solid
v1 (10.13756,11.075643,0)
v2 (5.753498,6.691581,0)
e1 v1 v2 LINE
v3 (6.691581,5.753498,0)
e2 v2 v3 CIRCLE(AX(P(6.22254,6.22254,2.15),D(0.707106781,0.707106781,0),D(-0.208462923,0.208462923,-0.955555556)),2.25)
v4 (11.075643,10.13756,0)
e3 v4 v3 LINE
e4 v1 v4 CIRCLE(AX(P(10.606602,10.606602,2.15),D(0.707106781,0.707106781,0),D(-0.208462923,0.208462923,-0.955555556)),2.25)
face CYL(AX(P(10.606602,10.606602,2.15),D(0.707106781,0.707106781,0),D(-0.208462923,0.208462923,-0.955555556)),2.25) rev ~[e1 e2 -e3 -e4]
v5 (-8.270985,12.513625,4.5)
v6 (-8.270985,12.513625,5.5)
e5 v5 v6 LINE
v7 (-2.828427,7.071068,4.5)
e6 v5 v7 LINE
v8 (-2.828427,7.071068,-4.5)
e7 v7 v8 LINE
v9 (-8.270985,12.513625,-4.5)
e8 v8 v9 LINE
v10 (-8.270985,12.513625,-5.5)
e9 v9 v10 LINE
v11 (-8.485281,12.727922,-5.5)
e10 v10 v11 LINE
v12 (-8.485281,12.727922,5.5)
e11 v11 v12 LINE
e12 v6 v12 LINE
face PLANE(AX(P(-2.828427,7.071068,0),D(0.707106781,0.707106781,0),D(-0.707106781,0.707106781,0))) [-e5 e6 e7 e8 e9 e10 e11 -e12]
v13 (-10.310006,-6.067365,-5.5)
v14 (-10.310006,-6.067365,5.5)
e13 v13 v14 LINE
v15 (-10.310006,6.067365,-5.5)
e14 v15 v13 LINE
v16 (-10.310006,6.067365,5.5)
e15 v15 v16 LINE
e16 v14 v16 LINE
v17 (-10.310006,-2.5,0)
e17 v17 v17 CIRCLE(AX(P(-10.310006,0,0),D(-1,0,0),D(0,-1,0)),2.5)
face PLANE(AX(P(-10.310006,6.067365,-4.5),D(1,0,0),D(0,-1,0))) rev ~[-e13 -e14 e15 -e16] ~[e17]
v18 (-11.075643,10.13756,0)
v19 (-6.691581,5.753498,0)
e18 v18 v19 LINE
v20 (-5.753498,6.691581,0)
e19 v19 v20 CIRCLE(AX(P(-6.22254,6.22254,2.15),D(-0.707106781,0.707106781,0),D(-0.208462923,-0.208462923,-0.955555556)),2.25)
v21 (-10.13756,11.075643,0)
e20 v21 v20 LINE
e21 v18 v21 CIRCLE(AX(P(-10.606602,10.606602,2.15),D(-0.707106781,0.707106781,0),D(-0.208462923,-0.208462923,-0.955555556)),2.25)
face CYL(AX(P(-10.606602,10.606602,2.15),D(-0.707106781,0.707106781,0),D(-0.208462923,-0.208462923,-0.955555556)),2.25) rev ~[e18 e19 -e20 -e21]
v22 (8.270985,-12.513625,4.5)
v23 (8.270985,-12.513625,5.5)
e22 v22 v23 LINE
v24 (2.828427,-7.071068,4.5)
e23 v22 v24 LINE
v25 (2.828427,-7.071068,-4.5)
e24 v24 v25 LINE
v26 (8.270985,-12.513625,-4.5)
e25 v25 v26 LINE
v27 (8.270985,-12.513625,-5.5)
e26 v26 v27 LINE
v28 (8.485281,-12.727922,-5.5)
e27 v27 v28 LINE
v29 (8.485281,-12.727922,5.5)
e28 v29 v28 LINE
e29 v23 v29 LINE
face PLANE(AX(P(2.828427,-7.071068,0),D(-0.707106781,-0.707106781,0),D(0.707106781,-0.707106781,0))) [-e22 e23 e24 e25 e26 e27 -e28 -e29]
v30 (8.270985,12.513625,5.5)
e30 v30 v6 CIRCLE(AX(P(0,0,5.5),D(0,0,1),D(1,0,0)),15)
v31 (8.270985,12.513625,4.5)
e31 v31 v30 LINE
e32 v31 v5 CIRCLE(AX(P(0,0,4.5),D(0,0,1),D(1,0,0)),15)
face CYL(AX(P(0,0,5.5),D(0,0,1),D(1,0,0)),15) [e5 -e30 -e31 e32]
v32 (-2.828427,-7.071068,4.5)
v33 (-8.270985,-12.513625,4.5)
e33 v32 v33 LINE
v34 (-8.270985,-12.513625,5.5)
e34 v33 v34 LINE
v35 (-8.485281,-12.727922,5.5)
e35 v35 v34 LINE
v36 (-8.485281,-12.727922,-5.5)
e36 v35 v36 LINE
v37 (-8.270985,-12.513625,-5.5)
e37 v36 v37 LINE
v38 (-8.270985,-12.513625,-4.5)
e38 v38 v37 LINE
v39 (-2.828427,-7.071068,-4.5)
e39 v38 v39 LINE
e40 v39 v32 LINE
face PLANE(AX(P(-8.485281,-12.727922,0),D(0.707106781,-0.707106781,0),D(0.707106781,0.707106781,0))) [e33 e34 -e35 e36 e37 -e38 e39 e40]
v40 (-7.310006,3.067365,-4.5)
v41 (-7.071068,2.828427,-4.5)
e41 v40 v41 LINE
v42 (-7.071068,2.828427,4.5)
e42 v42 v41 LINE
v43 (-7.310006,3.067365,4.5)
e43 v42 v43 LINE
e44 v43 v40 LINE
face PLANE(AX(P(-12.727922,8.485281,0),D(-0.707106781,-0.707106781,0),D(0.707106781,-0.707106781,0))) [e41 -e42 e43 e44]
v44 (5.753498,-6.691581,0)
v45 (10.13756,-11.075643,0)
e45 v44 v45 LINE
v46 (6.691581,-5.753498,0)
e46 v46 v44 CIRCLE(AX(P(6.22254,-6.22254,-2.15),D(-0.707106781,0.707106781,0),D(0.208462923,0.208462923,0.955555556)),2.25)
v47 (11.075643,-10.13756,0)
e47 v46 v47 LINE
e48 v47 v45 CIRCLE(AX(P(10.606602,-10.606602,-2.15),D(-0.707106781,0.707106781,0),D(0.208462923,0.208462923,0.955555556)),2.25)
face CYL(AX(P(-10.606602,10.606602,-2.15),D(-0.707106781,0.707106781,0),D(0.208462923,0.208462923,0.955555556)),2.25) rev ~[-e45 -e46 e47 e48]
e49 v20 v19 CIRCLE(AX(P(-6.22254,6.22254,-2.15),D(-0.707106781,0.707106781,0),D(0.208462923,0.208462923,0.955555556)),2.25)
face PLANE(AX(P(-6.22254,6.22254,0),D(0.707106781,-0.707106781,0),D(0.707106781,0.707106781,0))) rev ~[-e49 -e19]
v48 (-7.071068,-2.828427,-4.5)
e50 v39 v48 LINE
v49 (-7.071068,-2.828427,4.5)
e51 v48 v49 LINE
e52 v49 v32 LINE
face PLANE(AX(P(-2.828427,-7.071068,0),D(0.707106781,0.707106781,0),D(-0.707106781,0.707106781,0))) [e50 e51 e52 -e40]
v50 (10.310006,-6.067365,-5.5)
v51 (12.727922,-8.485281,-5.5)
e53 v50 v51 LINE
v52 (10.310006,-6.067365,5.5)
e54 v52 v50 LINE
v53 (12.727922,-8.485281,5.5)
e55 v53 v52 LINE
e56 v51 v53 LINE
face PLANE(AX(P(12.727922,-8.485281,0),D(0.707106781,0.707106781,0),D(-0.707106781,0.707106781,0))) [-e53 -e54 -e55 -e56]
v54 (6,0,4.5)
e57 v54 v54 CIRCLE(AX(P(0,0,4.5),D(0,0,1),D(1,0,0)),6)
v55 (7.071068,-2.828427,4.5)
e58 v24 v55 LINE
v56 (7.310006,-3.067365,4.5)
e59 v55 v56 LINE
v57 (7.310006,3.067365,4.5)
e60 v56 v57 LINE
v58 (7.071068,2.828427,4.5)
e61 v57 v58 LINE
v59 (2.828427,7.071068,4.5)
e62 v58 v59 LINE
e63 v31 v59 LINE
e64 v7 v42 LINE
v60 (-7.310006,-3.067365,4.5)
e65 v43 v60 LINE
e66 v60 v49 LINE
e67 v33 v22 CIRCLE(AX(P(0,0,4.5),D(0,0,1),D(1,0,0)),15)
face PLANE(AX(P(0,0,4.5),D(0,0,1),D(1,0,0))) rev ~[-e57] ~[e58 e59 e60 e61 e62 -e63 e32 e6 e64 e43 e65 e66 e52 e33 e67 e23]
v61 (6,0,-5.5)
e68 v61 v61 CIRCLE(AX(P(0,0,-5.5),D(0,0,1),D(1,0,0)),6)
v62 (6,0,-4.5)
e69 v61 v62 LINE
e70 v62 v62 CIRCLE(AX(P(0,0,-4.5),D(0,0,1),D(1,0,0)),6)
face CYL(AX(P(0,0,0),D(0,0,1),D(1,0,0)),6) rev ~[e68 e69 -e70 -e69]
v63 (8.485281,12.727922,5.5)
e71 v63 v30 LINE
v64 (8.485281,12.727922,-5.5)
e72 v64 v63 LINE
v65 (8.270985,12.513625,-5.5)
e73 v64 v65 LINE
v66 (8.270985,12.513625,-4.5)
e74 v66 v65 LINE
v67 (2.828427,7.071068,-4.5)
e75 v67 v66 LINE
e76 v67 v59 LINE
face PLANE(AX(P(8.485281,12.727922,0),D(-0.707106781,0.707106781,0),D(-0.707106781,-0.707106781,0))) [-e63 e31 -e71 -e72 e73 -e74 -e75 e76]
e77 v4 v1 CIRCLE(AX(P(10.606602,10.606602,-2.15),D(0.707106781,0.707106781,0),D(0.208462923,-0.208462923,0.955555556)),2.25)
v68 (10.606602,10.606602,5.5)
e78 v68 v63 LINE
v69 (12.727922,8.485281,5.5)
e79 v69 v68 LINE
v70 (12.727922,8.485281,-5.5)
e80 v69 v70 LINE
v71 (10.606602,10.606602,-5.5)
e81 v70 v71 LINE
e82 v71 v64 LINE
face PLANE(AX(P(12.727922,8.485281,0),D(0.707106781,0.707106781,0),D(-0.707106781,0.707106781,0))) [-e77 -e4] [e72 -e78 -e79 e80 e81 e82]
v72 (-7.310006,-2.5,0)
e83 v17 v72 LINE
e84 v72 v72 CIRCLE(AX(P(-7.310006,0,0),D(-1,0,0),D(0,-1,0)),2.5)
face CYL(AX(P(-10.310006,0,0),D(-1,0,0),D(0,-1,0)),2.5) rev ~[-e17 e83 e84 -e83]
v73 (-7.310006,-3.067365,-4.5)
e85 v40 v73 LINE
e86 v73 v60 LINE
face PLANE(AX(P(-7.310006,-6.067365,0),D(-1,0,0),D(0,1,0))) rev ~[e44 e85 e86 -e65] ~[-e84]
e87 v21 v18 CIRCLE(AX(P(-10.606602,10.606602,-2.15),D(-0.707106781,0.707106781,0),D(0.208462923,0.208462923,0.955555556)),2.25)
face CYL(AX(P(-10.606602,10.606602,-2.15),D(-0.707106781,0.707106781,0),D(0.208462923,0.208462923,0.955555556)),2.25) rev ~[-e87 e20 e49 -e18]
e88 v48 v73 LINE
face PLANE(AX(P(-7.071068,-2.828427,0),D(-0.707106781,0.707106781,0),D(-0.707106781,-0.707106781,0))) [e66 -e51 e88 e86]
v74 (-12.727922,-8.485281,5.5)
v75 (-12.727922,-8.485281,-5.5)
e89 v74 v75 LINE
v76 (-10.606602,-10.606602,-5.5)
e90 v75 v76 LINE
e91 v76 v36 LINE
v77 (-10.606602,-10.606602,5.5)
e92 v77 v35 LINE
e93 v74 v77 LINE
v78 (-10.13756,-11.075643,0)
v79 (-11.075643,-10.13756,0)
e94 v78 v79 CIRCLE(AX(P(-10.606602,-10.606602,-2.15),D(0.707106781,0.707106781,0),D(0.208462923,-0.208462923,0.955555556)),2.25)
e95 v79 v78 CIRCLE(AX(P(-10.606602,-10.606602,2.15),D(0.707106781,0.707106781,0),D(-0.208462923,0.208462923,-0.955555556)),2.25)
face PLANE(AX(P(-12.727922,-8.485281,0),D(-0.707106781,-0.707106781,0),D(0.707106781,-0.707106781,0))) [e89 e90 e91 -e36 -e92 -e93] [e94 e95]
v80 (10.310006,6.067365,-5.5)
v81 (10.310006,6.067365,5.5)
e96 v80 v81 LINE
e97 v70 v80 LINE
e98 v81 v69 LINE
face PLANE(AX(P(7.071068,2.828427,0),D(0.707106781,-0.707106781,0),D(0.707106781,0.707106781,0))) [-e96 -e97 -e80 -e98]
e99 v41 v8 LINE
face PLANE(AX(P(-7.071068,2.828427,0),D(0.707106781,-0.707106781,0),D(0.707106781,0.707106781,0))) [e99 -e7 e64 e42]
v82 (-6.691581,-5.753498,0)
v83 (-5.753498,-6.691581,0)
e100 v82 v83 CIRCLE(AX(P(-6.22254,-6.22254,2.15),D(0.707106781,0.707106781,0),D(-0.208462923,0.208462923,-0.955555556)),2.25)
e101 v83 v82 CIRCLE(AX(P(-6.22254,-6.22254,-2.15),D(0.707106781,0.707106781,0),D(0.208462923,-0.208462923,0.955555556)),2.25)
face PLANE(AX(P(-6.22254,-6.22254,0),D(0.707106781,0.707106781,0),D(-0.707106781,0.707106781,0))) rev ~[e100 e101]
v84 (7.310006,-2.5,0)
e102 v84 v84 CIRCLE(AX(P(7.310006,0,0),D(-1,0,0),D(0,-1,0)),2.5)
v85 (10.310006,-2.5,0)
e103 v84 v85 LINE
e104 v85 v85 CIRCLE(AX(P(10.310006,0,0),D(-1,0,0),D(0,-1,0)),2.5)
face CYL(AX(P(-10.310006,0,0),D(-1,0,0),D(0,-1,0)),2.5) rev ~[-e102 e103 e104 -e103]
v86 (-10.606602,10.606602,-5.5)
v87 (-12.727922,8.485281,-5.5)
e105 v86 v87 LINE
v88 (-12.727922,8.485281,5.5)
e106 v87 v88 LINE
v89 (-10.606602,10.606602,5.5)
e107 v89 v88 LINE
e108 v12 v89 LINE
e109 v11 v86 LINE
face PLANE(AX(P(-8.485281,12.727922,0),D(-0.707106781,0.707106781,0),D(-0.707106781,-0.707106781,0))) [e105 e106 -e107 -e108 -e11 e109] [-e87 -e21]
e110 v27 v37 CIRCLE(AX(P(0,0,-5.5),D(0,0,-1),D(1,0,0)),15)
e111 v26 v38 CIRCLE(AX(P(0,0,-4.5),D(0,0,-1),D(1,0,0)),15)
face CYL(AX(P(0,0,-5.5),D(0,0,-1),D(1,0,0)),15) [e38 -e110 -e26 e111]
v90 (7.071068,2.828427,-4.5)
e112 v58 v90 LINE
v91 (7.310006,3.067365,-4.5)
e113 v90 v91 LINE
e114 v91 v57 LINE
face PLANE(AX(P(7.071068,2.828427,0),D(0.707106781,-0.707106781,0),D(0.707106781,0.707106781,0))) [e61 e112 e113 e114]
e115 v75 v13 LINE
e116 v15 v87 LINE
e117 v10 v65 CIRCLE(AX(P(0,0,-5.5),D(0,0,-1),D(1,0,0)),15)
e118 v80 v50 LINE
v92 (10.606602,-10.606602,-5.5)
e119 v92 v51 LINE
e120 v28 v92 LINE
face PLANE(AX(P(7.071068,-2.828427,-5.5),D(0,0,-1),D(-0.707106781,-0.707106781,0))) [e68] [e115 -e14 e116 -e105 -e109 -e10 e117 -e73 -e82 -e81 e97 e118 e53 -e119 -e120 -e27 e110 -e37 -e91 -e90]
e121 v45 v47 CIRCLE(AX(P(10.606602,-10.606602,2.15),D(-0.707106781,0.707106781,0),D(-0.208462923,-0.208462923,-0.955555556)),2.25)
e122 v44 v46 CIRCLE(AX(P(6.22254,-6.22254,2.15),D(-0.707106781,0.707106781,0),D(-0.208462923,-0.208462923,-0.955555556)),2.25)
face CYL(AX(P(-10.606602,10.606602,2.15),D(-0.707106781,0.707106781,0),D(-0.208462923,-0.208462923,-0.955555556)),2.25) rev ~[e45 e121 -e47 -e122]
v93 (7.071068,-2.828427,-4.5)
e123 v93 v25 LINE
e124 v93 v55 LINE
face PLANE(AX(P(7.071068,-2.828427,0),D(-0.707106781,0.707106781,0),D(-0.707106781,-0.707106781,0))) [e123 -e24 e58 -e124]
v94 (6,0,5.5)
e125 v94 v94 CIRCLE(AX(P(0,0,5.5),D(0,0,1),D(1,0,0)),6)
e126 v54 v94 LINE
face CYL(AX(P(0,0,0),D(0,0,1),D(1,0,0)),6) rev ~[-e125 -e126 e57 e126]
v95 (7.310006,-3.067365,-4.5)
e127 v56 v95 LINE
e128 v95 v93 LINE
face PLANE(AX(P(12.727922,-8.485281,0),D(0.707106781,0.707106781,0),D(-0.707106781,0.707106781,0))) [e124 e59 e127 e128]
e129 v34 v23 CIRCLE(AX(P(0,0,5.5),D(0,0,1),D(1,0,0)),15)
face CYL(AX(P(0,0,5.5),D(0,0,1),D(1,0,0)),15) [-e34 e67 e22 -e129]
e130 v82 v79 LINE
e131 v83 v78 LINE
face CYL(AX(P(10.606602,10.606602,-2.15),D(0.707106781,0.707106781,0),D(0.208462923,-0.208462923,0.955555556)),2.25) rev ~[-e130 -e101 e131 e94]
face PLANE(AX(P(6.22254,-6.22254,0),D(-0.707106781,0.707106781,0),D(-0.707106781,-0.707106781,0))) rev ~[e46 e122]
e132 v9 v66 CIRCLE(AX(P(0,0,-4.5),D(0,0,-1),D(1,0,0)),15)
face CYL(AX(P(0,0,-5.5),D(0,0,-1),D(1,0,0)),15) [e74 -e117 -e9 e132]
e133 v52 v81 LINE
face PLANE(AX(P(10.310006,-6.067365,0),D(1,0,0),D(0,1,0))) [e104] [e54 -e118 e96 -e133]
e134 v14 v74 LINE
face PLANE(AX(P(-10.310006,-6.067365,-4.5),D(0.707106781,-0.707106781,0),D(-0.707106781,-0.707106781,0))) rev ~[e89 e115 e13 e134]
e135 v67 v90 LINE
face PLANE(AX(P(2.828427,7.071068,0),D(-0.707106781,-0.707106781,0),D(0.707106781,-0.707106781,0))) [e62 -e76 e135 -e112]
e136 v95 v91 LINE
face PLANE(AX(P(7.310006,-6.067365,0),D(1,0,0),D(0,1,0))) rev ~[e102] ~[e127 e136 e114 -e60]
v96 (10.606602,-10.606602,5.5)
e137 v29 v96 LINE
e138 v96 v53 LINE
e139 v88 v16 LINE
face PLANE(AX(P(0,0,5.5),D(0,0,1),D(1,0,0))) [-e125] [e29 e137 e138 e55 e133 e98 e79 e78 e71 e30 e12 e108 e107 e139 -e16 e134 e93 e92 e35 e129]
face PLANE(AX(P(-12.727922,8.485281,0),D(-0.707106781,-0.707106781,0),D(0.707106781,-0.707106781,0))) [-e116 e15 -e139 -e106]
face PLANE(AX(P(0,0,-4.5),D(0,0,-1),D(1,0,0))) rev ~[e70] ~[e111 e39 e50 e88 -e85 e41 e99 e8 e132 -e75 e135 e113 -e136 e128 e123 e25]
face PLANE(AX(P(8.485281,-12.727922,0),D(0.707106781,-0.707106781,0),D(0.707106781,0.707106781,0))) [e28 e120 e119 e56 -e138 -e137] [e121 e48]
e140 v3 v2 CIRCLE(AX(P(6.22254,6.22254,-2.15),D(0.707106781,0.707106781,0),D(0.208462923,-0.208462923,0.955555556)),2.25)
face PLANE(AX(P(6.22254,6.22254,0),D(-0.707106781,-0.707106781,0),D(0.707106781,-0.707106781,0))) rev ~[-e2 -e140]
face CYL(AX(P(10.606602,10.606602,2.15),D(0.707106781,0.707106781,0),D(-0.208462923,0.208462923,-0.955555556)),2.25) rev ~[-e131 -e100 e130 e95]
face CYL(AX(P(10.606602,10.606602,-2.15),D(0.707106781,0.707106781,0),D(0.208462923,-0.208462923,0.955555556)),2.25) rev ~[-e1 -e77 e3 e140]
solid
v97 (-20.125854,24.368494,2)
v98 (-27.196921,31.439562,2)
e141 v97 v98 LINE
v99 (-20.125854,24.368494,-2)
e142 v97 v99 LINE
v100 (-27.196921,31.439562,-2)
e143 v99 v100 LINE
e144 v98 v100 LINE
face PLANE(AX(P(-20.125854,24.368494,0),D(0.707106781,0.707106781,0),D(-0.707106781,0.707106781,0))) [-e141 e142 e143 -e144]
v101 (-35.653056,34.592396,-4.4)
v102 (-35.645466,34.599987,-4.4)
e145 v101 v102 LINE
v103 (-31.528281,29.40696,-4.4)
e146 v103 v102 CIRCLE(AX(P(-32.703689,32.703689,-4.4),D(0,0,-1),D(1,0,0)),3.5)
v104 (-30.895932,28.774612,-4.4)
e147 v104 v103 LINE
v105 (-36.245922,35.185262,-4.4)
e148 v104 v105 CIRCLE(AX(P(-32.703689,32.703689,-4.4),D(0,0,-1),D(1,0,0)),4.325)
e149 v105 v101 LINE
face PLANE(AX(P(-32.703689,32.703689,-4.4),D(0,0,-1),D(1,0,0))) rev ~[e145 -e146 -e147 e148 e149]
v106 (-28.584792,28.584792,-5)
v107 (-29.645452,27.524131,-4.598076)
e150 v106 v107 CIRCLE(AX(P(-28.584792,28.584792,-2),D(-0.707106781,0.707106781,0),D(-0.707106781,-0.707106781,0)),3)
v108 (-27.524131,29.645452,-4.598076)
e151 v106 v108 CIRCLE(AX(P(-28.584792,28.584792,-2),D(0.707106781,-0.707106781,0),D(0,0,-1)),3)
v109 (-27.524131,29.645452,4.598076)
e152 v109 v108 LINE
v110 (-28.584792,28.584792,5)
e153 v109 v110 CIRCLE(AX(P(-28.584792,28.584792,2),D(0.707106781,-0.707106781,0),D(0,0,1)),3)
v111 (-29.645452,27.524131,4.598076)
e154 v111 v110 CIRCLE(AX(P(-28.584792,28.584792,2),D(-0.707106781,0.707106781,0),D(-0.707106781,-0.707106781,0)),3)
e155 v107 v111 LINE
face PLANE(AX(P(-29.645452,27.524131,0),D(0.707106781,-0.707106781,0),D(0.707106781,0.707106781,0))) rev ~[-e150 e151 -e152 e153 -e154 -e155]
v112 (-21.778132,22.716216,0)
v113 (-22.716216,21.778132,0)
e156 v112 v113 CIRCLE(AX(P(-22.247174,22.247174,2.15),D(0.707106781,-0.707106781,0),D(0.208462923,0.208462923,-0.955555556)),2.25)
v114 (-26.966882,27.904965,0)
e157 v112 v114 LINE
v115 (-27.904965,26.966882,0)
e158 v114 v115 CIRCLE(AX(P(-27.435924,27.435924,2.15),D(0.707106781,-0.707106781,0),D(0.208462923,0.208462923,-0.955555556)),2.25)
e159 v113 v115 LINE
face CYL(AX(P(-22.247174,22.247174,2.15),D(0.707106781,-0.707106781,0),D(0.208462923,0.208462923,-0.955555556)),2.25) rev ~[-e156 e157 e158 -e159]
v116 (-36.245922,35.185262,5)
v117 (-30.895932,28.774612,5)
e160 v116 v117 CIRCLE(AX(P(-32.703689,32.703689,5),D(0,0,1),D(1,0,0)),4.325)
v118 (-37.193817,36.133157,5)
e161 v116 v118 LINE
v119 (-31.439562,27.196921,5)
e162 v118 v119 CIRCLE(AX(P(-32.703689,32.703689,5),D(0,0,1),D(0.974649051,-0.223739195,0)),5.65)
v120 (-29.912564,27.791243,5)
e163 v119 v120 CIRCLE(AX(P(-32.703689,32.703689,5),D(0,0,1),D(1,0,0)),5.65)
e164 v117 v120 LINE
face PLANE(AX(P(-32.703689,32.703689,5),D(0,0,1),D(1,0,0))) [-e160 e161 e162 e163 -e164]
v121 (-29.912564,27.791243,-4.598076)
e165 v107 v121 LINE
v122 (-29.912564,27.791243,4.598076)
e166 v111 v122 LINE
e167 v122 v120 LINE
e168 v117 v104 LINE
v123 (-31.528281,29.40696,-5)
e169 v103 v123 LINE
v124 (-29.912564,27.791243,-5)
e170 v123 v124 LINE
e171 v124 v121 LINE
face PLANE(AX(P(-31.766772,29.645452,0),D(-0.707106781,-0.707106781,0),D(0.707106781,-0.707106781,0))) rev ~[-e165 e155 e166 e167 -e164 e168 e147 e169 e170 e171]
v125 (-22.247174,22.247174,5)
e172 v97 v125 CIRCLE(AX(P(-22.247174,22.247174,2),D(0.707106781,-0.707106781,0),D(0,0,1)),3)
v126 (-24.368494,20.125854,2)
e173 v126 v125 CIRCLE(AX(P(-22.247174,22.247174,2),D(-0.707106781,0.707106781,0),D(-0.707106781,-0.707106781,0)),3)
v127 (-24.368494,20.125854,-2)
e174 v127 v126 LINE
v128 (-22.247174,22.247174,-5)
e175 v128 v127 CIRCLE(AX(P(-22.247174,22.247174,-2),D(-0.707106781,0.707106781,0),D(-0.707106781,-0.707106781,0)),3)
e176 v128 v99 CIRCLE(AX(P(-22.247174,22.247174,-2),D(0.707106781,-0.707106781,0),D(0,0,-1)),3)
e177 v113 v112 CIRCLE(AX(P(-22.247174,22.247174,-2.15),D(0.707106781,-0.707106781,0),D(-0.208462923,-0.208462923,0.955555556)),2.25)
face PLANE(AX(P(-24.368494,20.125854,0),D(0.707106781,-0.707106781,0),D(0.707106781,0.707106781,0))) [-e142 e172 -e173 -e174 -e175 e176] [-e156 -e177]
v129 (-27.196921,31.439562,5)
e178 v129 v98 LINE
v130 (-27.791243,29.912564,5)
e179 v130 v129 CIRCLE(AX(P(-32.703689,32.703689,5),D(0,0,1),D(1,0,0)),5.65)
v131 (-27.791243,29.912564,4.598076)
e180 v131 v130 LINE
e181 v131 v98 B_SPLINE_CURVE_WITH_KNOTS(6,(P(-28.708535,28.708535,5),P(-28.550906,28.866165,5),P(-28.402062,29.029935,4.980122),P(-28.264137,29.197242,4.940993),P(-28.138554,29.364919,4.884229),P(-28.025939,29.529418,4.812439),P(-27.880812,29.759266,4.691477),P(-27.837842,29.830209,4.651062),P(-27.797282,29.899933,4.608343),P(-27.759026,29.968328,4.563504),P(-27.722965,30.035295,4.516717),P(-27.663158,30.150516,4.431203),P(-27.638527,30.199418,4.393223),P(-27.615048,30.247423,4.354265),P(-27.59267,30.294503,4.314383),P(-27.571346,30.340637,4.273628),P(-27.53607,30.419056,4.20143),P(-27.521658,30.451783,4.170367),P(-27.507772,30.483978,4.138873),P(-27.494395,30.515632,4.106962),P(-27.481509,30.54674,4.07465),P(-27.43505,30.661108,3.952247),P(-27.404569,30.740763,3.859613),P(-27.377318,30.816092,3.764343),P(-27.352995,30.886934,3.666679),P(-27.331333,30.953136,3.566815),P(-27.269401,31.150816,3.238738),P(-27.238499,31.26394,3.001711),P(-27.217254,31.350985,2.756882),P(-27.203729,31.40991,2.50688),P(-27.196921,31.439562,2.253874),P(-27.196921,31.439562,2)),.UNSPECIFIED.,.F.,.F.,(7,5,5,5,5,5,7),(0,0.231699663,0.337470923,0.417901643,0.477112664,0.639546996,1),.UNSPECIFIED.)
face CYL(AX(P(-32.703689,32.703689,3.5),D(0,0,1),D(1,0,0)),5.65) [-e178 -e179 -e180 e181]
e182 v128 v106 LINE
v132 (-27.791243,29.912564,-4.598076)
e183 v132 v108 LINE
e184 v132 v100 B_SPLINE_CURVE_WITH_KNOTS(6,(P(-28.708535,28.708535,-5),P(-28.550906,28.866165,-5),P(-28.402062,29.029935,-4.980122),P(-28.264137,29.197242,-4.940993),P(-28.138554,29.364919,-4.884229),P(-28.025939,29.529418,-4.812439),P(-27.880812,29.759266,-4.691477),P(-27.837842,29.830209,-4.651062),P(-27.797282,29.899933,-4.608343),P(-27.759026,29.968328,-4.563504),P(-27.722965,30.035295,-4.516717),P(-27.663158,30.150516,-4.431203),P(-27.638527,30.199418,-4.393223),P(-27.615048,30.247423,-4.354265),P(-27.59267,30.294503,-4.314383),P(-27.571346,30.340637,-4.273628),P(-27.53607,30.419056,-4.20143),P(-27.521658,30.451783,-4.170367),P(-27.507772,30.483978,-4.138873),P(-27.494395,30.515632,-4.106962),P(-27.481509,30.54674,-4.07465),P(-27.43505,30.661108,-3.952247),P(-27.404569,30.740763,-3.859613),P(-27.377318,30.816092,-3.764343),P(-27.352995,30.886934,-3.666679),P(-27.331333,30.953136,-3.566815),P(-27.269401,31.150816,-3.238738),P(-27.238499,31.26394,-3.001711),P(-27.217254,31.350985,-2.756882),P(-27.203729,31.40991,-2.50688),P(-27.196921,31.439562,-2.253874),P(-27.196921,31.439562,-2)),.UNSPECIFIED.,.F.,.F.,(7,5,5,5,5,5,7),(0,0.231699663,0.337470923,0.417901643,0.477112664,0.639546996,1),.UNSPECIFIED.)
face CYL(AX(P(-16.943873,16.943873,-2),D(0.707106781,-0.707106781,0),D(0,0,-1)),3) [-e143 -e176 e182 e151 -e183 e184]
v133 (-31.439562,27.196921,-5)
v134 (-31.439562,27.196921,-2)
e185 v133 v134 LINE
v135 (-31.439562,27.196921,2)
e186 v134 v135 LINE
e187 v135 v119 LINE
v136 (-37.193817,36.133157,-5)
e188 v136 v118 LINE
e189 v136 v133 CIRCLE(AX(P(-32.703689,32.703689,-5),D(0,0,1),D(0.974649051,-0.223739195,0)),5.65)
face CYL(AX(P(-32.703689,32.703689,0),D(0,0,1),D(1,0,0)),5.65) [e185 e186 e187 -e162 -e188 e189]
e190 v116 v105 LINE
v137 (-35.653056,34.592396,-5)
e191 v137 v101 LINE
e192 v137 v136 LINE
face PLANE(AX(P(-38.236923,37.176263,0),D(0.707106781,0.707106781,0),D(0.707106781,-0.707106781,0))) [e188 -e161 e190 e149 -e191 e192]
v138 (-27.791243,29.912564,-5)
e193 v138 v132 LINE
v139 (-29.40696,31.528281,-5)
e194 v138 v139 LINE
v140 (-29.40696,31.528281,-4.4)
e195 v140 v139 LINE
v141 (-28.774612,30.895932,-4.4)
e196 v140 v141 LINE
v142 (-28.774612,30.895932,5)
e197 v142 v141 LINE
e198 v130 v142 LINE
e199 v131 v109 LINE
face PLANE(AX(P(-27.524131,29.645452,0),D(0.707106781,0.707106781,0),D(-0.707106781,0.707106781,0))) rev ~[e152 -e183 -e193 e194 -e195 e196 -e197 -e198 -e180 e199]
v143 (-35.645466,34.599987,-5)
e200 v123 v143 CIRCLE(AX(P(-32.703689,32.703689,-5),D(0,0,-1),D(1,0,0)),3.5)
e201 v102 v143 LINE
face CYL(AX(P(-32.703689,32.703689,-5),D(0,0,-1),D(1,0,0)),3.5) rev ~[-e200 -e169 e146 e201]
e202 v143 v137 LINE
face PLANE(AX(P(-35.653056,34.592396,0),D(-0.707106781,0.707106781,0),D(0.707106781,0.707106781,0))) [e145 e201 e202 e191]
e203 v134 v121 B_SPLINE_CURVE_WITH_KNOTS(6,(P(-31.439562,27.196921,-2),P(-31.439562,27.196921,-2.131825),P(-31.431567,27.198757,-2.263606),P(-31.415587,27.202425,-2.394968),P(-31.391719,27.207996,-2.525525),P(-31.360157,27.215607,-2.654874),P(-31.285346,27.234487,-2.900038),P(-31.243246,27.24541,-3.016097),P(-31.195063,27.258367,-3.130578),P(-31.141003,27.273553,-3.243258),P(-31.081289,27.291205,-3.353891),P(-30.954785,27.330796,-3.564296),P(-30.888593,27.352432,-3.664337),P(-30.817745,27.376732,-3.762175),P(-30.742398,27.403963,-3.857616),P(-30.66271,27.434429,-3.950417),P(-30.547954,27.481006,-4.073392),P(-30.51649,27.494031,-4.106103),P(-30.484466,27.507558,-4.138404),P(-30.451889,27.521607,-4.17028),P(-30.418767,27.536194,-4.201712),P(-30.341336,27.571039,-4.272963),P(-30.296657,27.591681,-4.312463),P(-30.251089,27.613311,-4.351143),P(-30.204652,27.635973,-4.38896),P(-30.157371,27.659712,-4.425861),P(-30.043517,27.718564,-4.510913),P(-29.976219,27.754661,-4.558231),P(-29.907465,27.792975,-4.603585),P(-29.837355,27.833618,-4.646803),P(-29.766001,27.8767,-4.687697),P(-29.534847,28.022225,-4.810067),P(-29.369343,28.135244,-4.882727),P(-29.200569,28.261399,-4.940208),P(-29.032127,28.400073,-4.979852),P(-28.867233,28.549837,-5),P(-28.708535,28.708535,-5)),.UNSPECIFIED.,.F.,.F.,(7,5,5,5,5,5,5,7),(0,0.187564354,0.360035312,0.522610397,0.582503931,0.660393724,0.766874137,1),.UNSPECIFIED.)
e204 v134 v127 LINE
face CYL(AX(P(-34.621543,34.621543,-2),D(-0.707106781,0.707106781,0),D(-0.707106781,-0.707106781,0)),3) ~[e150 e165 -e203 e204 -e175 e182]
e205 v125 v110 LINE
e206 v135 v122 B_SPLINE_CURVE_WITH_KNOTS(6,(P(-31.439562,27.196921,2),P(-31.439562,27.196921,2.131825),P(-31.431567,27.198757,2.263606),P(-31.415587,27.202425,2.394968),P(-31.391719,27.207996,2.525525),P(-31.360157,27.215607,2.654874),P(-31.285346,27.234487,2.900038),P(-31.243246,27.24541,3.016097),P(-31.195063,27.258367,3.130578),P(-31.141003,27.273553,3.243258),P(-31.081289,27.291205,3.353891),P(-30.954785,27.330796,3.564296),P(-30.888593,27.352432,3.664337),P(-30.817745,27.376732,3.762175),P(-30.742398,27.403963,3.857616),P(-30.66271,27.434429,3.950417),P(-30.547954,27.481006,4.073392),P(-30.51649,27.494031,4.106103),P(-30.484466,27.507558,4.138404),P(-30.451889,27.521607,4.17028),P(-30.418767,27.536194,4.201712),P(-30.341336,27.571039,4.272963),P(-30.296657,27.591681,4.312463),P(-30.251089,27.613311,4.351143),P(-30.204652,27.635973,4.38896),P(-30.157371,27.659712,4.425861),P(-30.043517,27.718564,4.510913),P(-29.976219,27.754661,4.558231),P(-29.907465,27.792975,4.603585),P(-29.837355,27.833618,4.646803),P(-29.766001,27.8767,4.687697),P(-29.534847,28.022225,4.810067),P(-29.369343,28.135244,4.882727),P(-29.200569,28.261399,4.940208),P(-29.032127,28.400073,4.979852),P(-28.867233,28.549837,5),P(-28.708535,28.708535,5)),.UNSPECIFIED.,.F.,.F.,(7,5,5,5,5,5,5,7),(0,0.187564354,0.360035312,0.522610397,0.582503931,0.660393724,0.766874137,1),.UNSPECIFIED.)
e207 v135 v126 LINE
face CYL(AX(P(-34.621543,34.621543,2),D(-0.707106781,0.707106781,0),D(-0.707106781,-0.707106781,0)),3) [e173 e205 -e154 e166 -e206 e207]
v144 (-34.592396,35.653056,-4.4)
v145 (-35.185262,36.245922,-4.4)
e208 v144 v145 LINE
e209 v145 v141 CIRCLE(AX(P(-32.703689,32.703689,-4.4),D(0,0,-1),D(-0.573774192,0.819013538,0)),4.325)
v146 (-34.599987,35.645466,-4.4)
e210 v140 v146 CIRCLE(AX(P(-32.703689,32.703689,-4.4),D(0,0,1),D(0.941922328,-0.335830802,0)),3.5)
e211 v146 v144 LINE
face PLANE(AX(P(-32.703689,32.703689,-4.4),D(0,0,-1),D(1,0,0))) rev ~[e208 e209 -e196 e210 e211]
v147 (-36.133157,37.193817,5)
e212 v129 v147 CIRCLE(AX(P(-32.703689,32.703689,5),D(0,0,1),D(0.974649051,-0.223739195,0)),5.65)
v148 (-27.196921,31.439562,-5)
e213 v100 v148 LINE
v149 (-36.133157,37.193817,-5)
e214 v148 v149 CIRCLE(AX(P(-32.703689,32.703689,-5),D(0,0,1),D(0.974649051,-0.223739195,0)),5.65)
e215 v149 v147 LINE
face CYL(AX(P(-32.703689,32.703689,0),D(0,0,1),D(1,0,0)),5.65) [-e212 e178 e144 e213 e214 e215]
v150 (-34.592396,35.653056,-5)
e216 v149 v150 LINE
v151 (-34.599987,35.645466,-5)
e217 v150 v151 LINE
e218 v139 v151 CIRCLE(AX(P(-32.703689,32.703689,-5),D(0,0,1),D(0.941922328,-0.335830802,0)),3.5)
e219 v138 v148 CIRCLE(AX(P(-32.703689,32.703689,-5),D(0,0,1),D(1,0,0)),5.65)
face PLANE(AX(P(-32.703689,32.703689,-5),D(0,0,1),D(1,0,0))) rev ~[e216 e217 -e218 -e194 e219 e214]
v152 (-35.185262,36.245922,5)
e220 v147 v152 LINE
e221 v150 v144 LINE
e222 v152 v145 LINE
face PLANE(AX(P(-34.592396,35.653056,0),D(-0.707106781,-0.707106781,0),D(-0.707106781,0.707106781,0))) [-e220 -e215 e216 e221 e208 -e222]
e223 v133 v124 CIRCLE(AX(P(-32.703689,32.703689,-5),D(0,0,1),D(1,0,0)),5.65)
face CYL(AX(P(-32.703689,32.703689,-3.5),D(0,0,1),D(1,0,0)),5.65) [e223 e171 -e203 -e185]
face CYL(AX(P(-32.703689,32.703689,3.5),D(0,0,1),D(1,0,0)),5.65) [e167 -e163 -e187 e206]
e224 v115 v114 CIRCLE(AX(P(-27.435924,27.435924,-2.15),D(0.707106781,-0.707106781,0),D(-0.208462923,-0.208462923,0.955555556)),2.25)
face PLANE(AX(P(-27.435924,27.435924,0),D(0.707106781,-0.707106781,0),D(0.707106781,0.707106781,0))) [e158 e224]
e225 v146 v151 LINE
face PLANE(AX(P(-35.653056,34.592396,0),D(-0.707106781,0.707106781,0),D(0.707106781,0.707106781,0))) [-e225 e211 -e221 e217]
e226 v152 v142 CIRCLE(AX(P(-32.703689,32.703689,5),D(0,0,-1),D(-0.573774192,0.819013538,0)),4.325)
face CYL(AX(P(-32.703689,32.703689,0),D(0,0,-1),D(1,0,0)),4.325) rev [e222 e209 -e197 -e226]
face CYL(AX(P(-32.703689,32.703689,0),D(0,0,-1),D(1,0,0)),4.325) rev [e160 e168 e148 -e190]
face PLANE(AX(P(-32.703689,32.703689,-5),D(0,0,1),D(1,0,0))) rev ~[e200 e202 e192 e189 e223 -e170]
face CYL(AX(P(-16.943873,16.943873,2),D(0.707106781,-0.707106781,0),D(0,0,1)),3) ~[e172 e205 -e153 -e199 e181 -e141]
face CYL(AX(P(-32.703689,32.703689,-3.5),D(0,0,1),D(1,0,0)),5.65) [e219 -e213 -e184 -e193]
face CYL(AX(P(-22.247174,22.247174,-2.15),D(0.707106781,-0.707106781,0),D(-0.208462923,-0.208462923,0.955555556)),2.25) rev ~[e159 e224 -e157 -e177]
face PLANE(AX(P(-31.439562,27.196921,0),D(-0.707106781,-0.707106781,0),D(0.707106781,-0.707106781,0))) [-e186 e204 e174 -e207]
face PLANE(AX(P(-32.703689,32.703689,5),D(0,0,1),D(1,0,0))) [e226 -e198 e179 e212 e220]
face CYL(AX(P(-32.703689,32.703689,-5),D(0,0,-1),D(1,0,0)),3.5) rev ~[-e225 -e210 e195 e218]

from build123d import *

# Parameters (mm, degrees)
F2_DEPTH      = 5.5
F3_R          = 15
F4_DEPTH      = 1
F5_W          = 3
F5_H          = 12.1347305831
F6_DEPTH      = 5
F7_R          = 15
F8_DEPTH      = 1
F9_R          = 6
F10_DEPTH     = 12.5
F12_DEPTH     = 100
F14_DEPTH     = 100
F15_R         = 2.5
F16_DEPTH     = 100
F17_W         = 6
F17_H         = 11
F18_DEPTH     = 1.8
F19_W         = 6
F19_H         = 9
F20_DEPTH     = 1.8
F21_W         = 6
F21_H         = 9
F22_DEPTH     = 1.8
F23_W         = 6
F23_H         = 9
F24_DEPTH     = 1.8
F25_R         = 5.65
F25_R_2       = 4.325
F26_DEPTH     = 5
F28_DEPTH     = 5
F31_R         = 5.65
F31_R_2       = 3.5
F32_DEPTH     = 0.6
F33_DEPTH     = 12.5
F35_DEPTH     = 7.338
F36_T4_DEPTH  = 25
F36_S5_R      = 5.65
F36_T6_DEPTH  = 16
F36_T10_DEPTH = 25
F36_S11_R     = 5.65
F36_T12_DEPTH = 16
F36_T16_DEPTH = 25
F36_S17_R     = 5.65
F36_T18_DEPTH = 16
F36_T22_DEPTH = 25
F36_S23_R     = 5.65
F36_T24_DEPTH = 16
F37_DEPTH     = 12.5


# Not quite as in the source:
# - a fillet or chamfer that OpenCascade refuses, or shapes differently, is made with other operations: its cross-section is extruded or revolved along the edge and cut away or added


with BuildPart() as f2:
    # F1 (on Top) → F2 (new body, symmetric)
    with BuildSketch(Plane.XY):
        Polygon((12.7279220614, 8.4852813742), (8.4852813742, 12.7279220614), (2.8284271247, 7.0710678119), (7.0710678119, 2.8284271247), align=None)
    extrude(amount=F2_DEPTH, both=True)



with BuildPart() as f2b:
    # F1 (on Top) → F2, piece 2 (new body, symmetric)
    with BuildSketch(Plane.XY):
        Polygon((8.4852813742, -12.7279220614), (12.7279220614, -8.4852813742), (7.0710678119, -2.8284271247), (2.8284271247, -7.0710678119), align=None)
    extrude(amount=F2_DEPTH, both=True)


with BuildPart() as f2c:
    # F1 (on Top) → F2, piece 3 (new body, symmetric)
    with BuildSketch(Plane.XY):
        Polygon((-8.4852813742, -12.7279220614), (-2.8284271247, -7.0710678119), (-7.0710678119, -2.8284271247), (-12.7279220614, -8.4852813742), align=None)
    extrude(amount=F2_DEPTH, both=True)


with BuildPart() as f2d:
    # F1 (on Top) → F2, piece 4 (new body, symmetric)
    with BuildSketch(Plane.XY):
        Polygon((-2.8284271247, 7.0710678119), (-8.4852813742, 12.7279220614), (-12.7279220614, 8.4852813742), (-7.0710678119, 2.8284271247), align=None)
    extrude(amount=F2_DEPTH, both=True)


with BuildPart() as f2_1:
    add(f2.part)

    add(f2b.part)  # F4 merges F2b

    add(f2c.part)  # F4 merges F2c

    add(f2d.part)  # F4 merges F2d
    # F3 (on face) → F4 (join)
    with BuildSketch(Plane.XY.offset(5.5)):
        Circle(F3_R)
    extrude(amount=-F4_DEPTH)

    # F5 (on Top) → F6 (join, symmetric)
    with BuildSketch(Plane.XY):
        with Locations((-8.8100059787, 0)):
            Rectangle(F5_W, F5_H)
        with Locations((8.8100059787, 0)):
            Rectangle(F5_W, F5_H)
    extrude(amount=F6_DEPTH, both=True)

    # F7 (on face) → F8 (join)
    with BuildSketch(Plane(origin=(0, 0, -5.5), x_dir=(1, 0, 0), z_dir=(0, 0, -1))):
        Circle(F7_R)
    extrude(amount=-F8_DEPTH)

    # F9 (on Top) → F10 (cut, symmetric)
    with BuildSketch(Plane.XY):
        Circle(F9_R)
    extrude(amount=F10_DEPTH, both=True, mode=Mode.SUBTRACT)

    # F11 (on face) → F12 (cut)
    with BuildSketch(Plane(origin=(10.6066017178, 10.6066017178, 0), x_dir=(-0.7071067812, 0.7071067812, 0), z_dir=(0.7071067812, 0.7071067812, 0))):
        with BuildLine():
            ThreePointArc((-0.6633249581, 0), (0, -4.4), (0.6633249581, 0))
            ThreePointArc((0.6633249581, 0), (0, 4.4), (-0.6633249581, 0))
        make_face()
    extrude(amount=-F12_DEPTH, mode=Mode.SUBTRACT)

    # F13 (on face) → F14 (cut)
    with BuildSketch(Plane(origin=(-10.6066017178, 10.6066017178, 0), x_dir=(-0.7071067812, -0.7071067812, 0), z_dir=(-0.7071067812, 0.7071067812, 0))):
        with BuildLine():
            ThreePointArc((-0.6633249581, 0), (0, -4.4), (0.6633249581, 0))
            ThreePointArc((0.6633249581, 0), (0, 4.4), (-0.6633249581, 0))
        make_face()
    extrude(amount=-F14_DEPTH, mode=Mode.SUBTRACT)

    # F15 (on face) → F16 (cut)
    with BuildSketch(Plane(origin=(-10.3100059787, 0, 0), x_dir=(0, -1, 0), z_dir=(-1, 0, 0))):
        Circle(F15_R)
    extrude(amount=-F16_DEPTH, mode=Mode.SUBTRACT)

    # F17 (on face) → F18 (join)
    with BuildSketch(Plane(origin=(4.9497474683, -4.9497474683, 0), x_dir=(-0.7071067812, -0.7071067812, 0), z_dir=(-0.7071067812, 0.7071067812, 0))):
        Rectangle(F17_W, F17_H)
    extrude(amount=-F18_DEPTH)

    # F19 (on face) → F20 (join)
    with BuildSketch(Plane(origin=(-4.9497474683, 4.9497474683, 0), x_dir=(0.7071067812, 0.7071067812, 0), z_dir=(0.7071067812, -0.7071067812, 0))):
        Rectangle(F19_W, F19_H)
    extrude(amount=-F20_DEPTH)

    # F21 (on face) → F22 (join)
    with BuildSketch(Plane(origin=(-4.9497474683, -4.9497474683, 0), x_dir=(-0.7071067812, 0.7071067812, 0), z_dir=(0.7071067812, 0.7071067812, 0))):
        Rectangle(F21_W, F21_H)
    extrude(amount=-F22_DEPTH)

    # F23 (on face) → F24 (join)
    with BuildSketch(Plane(origin=(4.9497474683, 4.9497474683, 0), x_dir=(0.7071067812, -0.7071067812, 0), z_dir=(-0.7071067812, -0.7071067812, 0))):
        Rectangle(F23_W, F23_H)
    extrude(amount=-F24_DEPTH)

    # F37 (cut, symmetric): faces of the model
    f37_faces = [f2_1.faces().sort_by_distance(p)[0] for p in [
        (-12.4284977083, 0, -4.5),
        (12.4284977083, 0, -4.5),
    ]]
    extrude(f37_faces, amount=F37_DEPTH, both=True, mode=Mode.SUBTRACT)


with BuildPart() as f26:
    # F25 (on Top) → F26 (new body, symmetric)
    with BuildSketch(Plane.XY):
        with Locations((-32.7036886299, 32.7036886299)):
            Circle(F25_R)
        with Locations((-32.7036886299, 32.7036886299)):
            Circle(F25_R_2, mode=Mode.SUBTRACT)
    extrude(amount=F26_DEPTH, both=True)

    # F27 (on Top) → F28 (join, symmetric)
    with BuildSketch(Plane.XY):
        Polygon((-27.1969214916, 31.4395621787), (-31.4395621787, 27.1969214916), (-24.3684943668, 20.1258536797), (-20.1258536797, 24.3684943668), align=None)
    extrude(amount=F28_DEPTH, both=True)

    # F31 (on face) → F32 (join)
    with BuildSketch(Plane(origin=(0, 0, -5), x_dir=(1, 0, 0), z_dir=(0, 0, -1))):
        with Locations((-32.7036886299, -32.7036886299)):
            Circle(F31_R)
        with Locations((-32.7036886299, -32.7036886299)):
            Circle(F31_R_2, mode=Mode.SUBTRACT)
    extrude(amount=-F32_DEPTH)

    # F30 (on Top) + F29 (on Top) → F33 (cut, symmetric)
    with BuildSketch(Plane.XY):
        Polygon((-38.2369231114, 37.1762629396), (-35.653056475, 34.5923963032), (-34.5923963032, 35.653056475), (-37.1762629396, 38.2369231114), align=None)
    with BuildSketch(Plane.XY):
        Polygon((-29.6454518012, 31.7667721448), (-31.7667721448, 29.6454518012), (-29.6454518012, 27.5241314577), (-27.5241314577, 29.6454518012), align=None)
    extrude(amount=F33_DEPTH, both=True, mode=Mode.SUBTRACT)

    # F34 (on face) → F35 (cut)
    with BuildSketch(Plane(origin=(-22.2471740233, 22.2471740233, 0), x_dir=(0.7071067812, 0.7071067812, 0), z_dir=(0.7071067812, -0.7071067812, 0))):
        with BuildLine():
            ThreePointArc((-0.6633249581, 0), (0, -4.4), (0.6633249581, 0))
            ThreePointArc((0.6633249581, 0), (0, 4.4), (-0.6633249581, 0))
        make_face()
    extrude(amount=-F35_DEPTH, mode=Mode.SUBTRACT)

    # F36: fillet of radius 3 on 4 edges, made by hand


with BuildPart() as f36_tool2:
    # F36_s3 → F36_t4 (new body)
    with BuildSketch(Plane(origin=(-16.9438731644, 16.9438731644, 0), x_dir=(0, 0, 1), z_dir=(-0.7071067812, 0.7071067812, 0))):
        with BuildLine():
            ThreePointArc((5, 0), (4.1213203436, 2.1213203436), (2, 3))
            Line((2, 3), (5, 3))
            Line((5, 3), (5, 0))
        make_face()
    extrude(amount=F36_T4_DEPTH)

    # F36_s5 → F36_t6 (cut, symmetric)
    with BuildSketch(Plane.XY.offset(3.5)):
        with Locations((-32.7036886299, 32.7036886299)):
            Circle(F36_S5_R)
    extrude(amount=F36_T6_DEPTH, both=True, mode=Mode.SUBTRACT)


with BuildPart() as f26_1:
    add(f26.part)

    # F36_t1: cut F36_tool2
    add(f36_tool2.part, mode=Mode.SUBTRACT)


with BuildPart() as f36_tool8:
    # F36_s9 → F36_t10 (new body)
    with BuildSketch(Plane(origin=(-34.621542694, 34.621542694, 0), x_dir=(0, 0, 1), z_dir=(0.7071067812, -0.7071067812, 0))):
        with BuildLine():
            ThreePointArc((2, 3), (4.1213203436, 2.1213203436), (5, 0))
            Line((5, 0), (5, 3))
            Line((5, 3), (2, 3))
        make_face()
    extrude(amount=F36_T10_DEPTH)

    # F36_s11 → F36_t12 (cut, symmetric)
    with BuildSketch(Plane.XY.offset(3.5)):
        with Locations((-32.7036886299, 32.7036886299)):
            Circle(F36_S11_R)
    extrude(amount=F36_T12_DEPTH, both=True, mode=Mode.SUBTRACT)


with BuildPart() as f26_2:
    add(f26_1.part)

    # F36_t7: cut F36_tool8
    add(f36_tool8.part, mode=Mode.SUBTRACT)


with BuildPart() as f36_tool14:
    # F36_s15 → F36_t16 (new body)
    with BuildSketch(Plane(origin=(-16.9438731644, 16.9438731644, 0), x_dir=(0, 0, 1), z_dir=(-0.7071067812, 0.7071067812, 0))):
        with BuildLine():
            ThreePointArc((-5, 0), (-4.1213203436, 2.1213203436), (-2, 3))
            Line((-2, 3), (-5, 3))
            Line((-5, 3), (-5, 0))
        make_face()
    extrude(amount=F36_T16_DEPTH)

    # F36_s17 → F36_t18 (cut, symmetric)
    with BuildSketch(Plane.XY.offset(-3.5)):
        with Locations((-32.7036886299, 32.7036886299)):
            Circle(F36_S17_R)
    extrude(amount=F36_T18_DEPTH, both=True, mode=Mode.SUBTRACT)


with BuildPart() as f26_3:
    add(f26_2.part)

    # F36_t13: cut F36_tool14
    add(f36_tool14.part, mode=Mode.SUBTRACT)


with BuildPart() as f36_tool20:
    # F36_s21 → F36_t22 (new body)
    with BuildSketch(Plane(origin=(-34.621542694, 34.621542694, 0), x_dir=(0, 0, 1), z_dir=(0.7071067812, -0.7071067812, 0))):
        with BuildLine():
            ThreePointArc((-2, 3), (-4.1213203436, 2.1213203436), (-5, 0))
            Line((-5, 0), (-5, 3))
            Line((-5, 3), (-2, 3))
        make_face()
    extrude(amount=F36_T22_DEPTH)

    # F36_s23 → F36_t24 (cut, symmetric)
    with BuildSketch(Plane.XY.offset(-3.5)):
        with Locations((-32.7036886299, 32.7036886299)):
            Circle(F36_S23_R)
    extrude(amount=F36_T24_DEPTH, both=True, mode=Mode.SUBTRACT)


with BuildPart() as f26_4:
    add(f26_3.part)

    # F36_t19: cut F36_tool20
    add(f36_tool20.part, mode=Mode.SUBTRACT)


solid = Compound([f2_1.part, f26_4.part])
